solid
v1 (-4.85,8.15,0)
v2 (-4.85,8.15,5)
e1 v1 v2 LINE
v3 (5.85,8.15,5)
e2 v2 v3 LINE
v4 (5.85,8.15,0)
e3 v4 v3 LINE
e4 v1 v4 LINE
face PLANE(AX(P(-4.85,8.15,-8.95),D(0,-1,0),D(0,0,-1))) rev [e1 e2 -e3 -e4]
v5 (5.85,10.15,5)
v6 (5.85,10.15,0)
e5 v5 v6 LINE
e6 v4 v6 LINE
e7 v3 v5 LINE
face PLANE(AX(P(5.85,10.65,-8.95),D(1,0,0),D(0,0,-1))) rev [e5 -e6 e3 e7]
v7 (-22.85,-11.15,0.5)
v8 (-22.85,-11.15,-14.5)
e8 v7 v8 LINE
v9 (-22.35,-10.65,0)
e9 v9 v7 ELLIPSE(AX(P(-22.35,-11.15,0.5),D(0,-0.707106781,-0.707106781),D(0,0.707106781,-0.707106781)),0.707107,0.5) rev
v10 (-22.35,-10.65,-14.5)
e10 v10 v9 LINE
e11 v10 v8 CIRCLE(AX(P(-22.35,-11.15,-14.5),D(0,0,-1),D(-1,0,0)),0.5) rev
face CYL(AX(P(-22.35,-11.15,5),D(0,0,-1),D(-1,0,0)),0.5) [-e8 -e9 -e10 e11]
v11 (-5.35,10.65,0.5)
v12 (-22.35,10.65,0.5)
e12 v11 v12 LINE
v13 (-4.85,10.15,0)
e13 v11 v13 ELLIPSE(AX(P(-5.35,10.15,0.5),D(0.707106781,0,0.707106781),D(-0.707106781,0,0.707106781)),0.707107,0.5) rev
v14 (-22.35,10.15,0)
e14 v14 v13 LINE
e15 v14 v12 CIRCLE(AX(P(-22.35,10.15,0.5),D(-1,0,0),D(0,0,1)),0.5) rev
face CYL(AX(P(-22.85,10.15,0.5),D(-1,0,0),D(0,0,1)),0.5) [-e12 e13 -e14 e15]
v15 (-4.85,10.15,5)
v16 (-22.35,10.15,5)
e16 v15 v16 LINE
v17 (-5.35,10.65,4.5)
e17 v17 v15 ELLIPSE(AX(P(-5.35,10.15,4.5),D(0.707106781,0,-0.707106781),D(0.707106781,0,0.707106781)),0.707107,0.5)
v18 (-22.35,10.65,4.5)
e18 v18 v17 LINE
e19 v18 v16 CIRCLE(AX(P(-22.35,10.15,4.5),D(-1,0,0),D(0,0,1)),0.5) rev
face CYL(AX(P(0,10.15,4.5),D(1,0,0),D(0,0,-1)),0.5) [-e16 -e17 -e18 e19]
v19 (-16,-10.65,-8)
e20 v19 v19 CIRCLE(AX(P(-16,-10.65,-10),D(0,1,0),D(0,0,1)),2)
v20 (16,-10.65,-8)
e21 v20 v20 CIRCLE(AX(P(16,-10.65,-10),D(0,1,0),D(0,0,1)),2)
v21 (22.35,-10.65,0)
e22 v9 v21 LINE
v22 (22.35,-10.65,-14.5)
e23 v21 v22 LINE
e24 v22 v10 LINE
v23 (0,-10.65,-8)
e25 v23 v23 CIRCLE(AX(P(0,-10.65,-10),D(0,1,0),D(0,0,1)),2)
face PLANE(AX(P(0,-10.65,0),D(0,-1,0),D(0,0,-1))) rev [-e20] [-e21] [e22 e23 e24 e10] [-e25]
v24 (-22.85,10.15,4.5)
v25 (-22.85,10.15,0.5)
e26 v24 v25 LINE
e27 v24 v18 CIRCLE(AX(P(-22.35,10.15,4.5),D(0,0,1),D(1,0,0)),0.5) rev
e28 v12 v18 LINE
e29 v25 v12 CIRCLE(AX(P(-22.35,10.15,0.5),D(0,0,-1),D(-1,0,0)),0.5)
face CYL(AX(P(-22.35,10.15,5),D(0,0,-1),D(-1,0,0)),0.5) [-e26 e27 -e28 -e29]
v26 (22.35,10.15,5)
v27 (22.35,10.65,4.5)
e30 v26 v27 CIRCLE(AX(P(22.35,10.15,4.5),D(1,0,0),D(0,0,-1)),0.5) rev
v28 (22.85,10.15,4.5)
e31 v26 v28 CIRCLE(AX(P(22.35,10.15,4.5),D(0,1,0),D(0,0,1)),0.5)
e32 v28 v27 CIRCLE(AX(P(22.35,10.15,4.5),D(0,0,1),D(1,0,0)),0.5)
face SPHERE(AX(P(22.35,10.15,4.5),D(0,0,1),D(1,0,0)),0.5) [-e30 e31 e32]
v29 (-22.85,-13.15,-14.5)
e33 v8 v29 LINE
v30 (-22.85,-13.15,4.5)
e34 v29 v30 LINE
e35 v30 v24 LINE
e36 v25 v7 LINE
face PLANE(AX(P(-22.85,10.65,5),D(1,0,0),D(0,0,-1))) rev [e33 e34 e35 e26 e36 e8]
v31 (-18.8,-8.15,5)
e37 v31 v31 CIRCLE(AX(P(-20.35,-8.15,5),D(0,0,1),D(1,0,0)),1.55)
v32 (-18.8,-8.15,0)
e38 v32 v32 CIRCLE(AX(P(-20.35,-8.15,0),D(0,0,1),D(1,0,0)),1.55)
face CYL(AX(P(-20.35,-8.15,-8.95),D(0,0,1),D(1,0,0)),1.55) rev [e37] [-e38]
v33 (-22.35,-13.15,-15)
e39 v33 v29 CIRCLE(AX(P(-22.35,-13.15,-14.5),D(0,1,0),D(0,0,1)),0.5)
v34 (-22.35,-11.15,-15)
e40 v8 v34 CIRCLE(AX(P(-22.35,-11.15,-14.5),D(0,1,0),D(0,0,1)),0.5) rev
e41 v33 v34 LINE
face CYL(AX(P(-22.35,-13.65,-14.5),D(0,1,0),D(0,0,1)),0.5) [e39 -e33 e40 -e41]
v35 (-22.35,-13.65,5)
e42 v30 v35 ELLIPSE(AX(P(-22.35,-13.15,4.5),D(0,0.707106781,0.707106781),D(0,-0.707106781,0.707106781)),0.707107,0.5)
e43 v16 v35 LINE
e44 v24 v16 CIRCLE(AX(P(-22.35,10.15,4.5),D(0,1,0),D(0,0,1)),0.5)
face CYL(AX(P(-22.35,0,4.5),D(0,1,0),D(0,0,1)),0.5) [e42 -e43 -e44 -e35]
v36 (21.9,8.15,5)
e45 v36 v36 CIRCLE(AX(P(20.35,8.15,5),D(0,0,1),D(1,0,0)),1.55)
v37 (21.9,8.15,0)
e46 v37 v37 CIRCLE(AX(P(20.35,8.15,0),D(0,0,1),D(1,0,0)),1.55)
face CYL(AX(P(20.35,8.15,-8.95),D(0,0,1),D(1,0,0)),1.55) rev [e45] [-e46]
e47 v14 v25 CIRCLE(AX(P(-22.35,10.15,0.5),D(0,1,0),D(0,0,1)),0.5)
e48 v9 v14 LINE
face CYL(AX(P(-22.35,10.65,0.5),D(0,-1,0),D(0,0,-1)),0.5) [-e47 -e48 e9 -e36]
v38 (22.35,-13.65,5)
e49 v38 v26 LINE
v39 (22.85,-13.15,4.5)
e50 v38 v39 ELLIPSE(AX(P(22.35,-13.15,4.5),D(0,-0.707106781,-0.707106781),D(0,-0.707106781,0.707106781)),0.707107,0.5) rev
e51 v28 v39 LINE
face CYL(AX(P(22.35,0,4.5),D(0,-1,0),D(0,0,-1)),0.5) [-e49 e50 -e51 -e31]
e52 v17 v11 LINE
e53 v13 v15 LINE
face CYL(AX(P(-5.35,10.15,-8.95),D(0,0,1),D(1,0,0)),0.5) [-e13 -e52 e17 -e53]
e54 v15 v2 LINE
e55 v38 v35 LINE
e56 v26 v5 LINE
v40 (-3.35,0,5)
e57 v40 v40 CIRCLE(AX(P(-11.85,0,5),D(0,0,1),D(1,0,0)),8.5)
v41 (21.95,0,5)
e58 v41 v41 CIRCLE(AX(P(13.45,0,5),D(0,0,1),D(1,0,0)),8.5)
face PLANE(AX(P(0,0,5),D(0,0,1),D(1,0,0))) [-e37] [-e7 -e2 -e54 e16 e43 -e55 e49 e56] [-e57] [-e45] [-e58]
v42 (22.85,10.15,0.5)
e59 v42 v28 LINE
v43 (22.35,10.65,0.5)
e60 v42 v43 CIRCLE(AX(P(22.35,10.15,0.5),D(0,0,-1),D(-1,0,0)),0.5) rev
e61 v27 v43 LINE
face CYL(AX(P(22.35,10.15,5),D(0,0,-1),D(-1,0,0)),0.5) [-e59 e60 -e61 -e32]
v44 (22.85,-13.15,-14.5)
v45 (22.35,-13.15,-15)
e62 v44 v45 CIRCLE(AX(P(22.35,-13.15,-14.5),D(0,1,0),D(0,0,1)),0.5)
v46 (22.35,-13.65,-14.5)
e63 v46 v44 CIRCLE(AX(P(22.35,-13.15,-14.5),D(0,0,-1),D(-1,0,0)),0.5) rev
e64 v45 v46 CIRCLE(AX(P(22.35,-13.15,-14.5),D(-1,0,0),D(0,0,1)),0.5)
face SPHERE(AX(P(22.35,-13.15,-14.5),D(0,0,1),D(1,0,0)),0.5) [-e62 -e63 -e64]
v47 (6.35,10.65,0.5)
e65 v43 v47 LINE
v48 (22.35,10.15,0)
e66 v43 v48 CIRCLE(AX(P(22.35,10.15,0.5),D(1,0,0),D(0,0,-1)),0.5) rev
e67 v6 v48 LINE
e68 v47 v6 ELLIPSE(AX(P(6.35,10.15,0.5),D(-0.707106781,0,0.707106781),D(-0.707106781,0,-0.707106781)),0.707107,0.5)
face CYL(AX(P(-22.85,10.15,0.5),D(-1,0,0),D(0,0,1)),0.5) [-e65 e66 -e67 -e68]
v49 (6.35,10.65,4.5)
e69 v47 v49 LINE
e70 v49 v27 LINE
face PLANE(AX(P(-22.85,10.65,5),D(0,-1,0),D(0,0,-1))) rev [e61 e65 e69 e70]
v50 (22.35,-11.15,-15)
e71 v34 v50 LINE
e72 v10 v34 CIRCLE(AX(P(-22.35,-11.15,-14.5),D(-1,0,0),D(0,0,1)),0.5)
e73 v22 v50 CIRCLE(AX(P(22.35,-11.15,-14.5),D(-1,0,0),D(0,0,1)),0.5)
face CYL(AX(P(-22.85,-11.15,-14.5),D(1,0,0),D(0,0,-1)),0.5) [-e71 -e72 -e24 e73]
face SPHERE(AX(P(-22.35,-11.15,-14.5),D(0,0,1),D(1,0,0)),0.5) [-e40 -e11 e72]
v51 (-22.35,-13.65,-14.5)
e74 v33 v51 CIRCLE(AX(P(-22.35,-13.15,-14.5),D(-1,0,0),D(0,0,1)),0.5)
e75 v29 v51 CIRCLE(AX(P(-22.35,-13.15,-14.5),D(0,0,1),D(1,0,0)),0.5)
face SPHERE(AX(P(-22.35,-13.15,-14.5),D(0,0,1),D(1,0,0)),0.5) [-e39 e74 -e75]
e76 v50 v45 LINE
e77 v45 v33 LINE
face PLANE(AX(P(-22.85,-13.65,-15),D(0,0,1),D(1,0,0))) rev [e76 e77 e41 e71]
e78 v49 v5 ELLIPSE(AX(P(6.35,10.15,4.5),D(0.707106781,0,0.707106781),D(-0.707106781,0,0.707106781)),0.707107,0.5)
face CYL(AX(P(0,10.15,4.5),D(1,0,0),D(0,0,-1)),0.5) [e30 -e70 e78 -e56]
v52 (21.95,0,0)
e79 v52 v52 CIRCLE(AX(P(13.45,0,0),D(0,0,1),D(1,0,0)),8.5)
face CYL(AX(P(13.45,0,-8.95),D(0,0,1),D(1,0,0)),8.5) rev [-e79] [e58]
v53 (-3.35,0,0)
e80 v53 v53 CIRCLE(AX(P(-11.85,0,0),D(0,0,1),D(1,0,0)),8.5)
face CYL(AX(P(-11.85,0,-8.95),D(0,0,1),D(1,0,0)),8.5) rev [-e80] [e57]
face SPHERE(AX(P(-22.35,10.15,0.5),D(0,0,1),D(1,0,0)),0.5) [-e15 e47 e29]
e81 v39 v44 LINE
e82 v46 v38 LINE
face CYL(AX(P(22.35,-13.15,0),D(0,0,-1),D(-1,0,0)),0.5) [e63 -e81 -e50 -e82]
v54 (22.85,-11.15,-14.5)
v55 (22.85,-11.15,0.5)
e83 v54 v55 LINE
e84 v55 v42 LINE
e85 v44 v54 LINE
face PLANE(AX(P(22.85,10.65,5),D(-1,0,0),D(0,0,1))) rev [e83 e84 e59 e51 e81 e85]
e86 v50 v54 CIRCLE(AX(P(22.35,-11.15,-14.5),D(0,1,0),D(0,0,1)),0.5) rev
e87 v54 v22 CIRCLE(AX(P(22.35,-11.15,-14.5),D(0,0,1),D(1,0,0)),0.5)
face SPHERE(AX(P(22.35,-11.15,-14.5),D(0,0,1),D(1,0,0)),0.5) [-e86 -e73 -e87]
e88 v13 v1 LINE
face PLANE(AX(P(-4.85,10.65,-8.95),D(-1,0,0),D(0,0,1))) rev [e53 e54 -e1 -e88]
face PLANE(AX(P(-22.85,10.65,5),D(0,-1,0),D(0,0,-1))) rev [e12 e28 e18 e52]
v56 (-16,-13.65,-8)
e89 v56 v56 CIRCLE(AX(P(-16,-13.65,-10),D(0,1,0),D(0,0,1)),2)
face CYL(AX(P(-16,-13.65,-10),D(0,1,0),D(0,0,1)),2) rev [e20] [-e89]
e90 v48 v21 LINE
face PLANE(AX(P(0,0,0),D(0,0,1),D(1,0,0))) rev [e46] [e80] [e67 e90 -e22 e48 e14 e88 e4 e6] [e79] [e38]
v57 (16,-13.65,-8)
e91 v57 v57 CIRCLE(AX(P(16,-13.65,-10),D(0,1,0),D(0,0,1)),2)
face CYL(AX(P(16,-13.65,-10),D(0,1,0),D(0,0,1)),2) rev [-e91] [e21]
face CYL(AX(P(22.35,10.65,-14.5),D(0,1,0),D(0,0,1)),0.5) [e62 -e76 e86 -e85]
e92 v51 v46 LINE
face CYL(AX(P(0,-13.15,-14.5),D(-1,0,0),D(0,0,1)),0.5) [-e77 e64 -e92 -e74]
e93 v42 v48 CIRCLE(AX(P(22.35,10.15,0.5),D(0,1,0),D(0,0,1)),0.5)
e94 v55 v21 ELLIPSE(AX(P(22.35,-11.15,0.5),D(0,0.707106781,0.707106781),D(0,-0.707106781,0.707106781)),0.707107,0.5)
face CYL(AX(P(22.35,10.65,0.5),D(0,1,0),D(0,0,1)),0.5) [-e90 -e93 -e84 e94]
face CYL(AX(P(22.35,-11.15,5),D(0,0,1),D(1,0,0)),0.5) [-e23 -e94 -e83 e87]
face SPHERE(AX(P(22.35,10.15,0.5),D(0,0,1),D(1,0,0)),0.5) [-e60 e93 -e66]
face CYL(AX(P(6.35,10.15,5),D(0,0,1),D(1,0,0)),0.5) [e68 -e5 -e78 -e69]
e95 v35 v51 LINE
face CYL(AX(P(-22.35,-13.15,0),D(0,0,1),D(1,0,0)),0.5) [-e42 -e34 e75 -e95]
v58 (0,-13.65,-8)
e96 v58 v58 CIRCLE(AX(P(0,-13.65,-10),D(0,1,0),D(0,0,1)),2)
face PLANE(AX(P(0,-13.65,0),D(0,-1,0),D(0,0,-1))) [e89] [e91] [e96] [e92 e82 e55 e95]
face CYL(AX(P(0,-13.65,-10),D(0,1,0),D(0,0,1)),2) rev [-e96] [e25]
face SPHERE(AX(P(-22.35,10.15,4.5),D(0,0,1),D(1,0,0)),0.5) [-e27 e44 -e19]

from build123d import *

# Parameters (mm, degrees)
SKETCH_1_W          = 45.7
SKETCH_1_H          = 21.3
EXTRUDE_1_DEPTH     = 5
SKETCH_2_R          = 1.55
SKETCH_2_R_2        = 8.5
CUT_EXTRUDE_1_DEPTH = 13.95
SKETCH_7_W          = 45.7
SKETCH_7_H          = 20
EXTRUDE_3_DEPTH     = 3
SKETCH_3_W          = 10.7
SKETCH_3_H          = 2.5
CUT_EXTRUDE_2_DEPTH = 13.95
FILLET_4_R          = 0.5
SKETCH_11_R         = 2
CUT_EXTRUDE_4_DEPTH = 3
FILLET_5_R          = 0.5


with BuildPart() as part:
    # 草圖1 → 填料-伸長1 (new body)
    with BuildSketch(Plane.XY):
        Rectangle(SKETCH_1_W, SKETCH_1_H)
    extrude(amount=EXTRUDE_1_DEPTH)

    # 草圖2 → 除料-伸長1 (cut)
    with BuildSketch(Plane.XY.offset(5)):
        with Locations((-20.35, -8.15)):
            Circle(SKETCH_2_R)
        with Locations((20.35, 8.15)):
            Circle(SKETCH_2_R)
        with Locations((-11.85, 0)):
            Circle(SKETCH_2_R_2)
        with Locations((13.45, 0)):
            Circle(SKETCH_2_R_2)
    extrude(amount=-CUT_EXTRUDE_1_DEPTH, mode=Mode.SUBTRACT)

    # 草圖7 → 填料-伸長3 (add)
    with BuildSketch(Plane.XZ.offset(10.65)):
        with Locations((0, -5)):
            Rectangle(SKETCH_7_W, SKETCH_7_H)
    extrude(amount=EXTRUDE_3_DEPTH)

    # 草圖3 → 除料-伸長2 (cut)
    with BuildSketch(Plane.XY.offset(5)):
        with Locations((0.5, 9.4)):
            Rectangle(SKETCH_3_W, SKETCH_3_H)
    extrude(amount=-CUT_EXTRUDE_2_DEPTH, mode=Mode.SUBTRACT)

    # 圓角4
    fillet_4_edges = [part.edges().sort_by_distance(p)[0] for p in [
        (14.35, 10.65, 5),
        (5.85, 10.65, 2.5),
        (14.35, 10.65, 0),
        (-13.85, 10.65, 0),
        (-4.85, 10.65, 2.5),
        (-13.85, 10.65, 5),
        (-22.85, 10.65, 2.5),
        (-22.85, -1.5, 5),
        (-22.85, -13.65, -5),
        (-22.85, -12.15, -15),
        (-22.85, -10.65, -7.5),
        (-22.85, 0, 0),
        (22.85, -10.65, -7.5),
        (22.85, -12.15, -15),
        (22.85, -13.65, -5),
        (22.85, -1.5, 5),
        (22.85, 10.65, 2.5),
        (22.85, 0, 0),
    ]]
    fillet(fillet_4_edges, radius=FILLET_4_R)

    # 草圖11 → 除料-伸長4 (cut)
    with BuildSketch(Plane(origin=(0, -10.65, 0), x_dir=(1, 0, 0), z_dir=(0, 1, 0))):
        with Locations(Location((0, 10, 0), (0, 0, 270))):
            Circle(SKETCH_11_R)
        with Locations(Location((16, 10, 0), (0, 0, 270))):
            Circle(SKETCH_11_R)
        with Locations(Location((-16, 10, 0), (0, 0, 270))):
            Circle(SKETCH_11_R)
    extrude(amount=-CUT_EXTRUDE_4_DEPTH, mode=Mode.SUBTRACT)

    # 圓角5
    # the kernel refuses this fillet: 0.5 mm, written as the material it takes off along each edge
    with BuildSketch(Plane(origin=(-22.35, -13.15, -14.5), x_dir=(0, 0, -1), z_dir=(0, -1, 0))) as fillet_5_piece_1_section:
        Polygon((0, 0), (FILLET_5_R, 0), (FILLET_5_R, -FILLET_5_R), (0, -FILLET_5_R), align=None)
    fillet_5_piece_1 = extrude(amount=FILLET_5_R, mode=Mode.PRIVATE)
    fillet_5_piece_1 = fillet_5_piece_1 - Plane(origin=(-22.35, -13.15, -14.5), x_dir=(0.7071067811865475, 0, 0.7071067811865475), z_dir=(0, -1, 0)) * Sphere(FILLET_5_R, mode=Mode.PRIVATE)
    add(fillet_5_piece_1, mode=Mode.SUBTRACT)
    with BuildSketch(Plane(origin=(-22.35, -11.15, -14.5), x_dir=(0, 0, -1), z_dir=(0, 1, 0))) as fillet_5_piece_2_section:
        Polygon((0, 0), (FILLET_5_R, 0), (FILLET_5_R, FILLET_5_R), (0, FILLET_5_R), align=None)
    fillet_5_piece_2 = extrude(amount=FILLET_5_R, mode=Mode.PRIVATE)
    fillet_5_piece_2 = fillet_5_piece_2 - Plane(origin=(-22.35, -11.15, -14.5), x_dir=(0.7071067811865475, 0, 0.7071067811865475), z_dir=(0, 1, 0)) * Sphere(FILLET_5_R, mode=Mode.PRIVATE)
    add(fillet_5_piece_2, mode=Mode.SUBTRACT)
    with BuildSketch(Plane(origin=(22.35, -11.15, -14.5), x_dir=(0, 0, -1), z_dir=(0, 1, 0))) as fillet_5_piece_3_section:
        Polygon((0, 0), (FILLET_5_R, 0), (FILLET_5_R, -FILLET_5_R), (0, -FILLET_5_R), align=None)
    fillet_5_piece_3 = extrude(amount=FILLET_5_R, mode=Mode.PRIVATE)
    fillet_5_piece_3 = fillet_5_piece_3 - Plane(origin=(22.35, -11.15, -14.5), x_dir=(-0.7071067811865475, 0, 0.7071067811865475), z_dir=(0, 1, 0)) * Sphere(FILLET_5_R, mode=Mode.PRIVATE)
    add(fillet_5_piece_3, mode=Mode.SUBTRACT)
    with BuildSketch(Plane(origin=(22.35, -13.15, -14.5), x_dir=(0, 0, -1), z_dir=(0, -1, 0))) as fillet_5_piece_4_section:
        Polygon((0, 0), (FILLET_5_R, 0), (FILLET_5_R, FILLET_5_R), (0, FILLET_5_R), align=None)
    fillet_5_piece_4 = extrude(amount=FILLET_5_R, mode=Mode.PRIVATE)
    fillet_5_piece_4 = fillet_5_piece_4 - Plane(origin=(22.35, -13.15, -14.5), x_dir=(-0.7071067811865475, 0, 0.7071067811865475), z_dir=(0, -1, 0)) * Sphere(FILLET_5_R, mode=Mode.PRIVATE)
    add(fillet_5_piece_4, mode=Mode.SUBTRACT)
    with BuildSketch(Plane(origin=(-22.35, -13.65, -15), x_dir=(0, 0, 1), z_dir=(1, 0, 0))) as fillet_5_piece_5:
        with BuildLine():
            CenterArc((FILLET_5_R, -FILLET_5_R), FILLET_5_R, 90, 90)
            Line((0, -FILLET_5_R), (0, 0))
            Line((0, 0), (FILLET_5_R, 0))
        make_face()
    extrude(amount=44.7, mode=Mode.SUBTRACT)
    with BuildSketch(Plane(origin=(-22.35, -10.65, -15), x_dir=(0, 0, 1), z_dir=(1, 0, 0))) as fillet_5_piece_6:
        with BuildLine():
            CenterArc((FILLET_5_R, FILLET_5_R), FILLET_5_R, 180, 90)
            Line((0, FILLET_5_R), (0, 0))
            Line((0, 0), (FILLET_5_R, 0))
        make_face()
    extrude(amount=44.7, mode=Mode.SUBTRACT)


solid = part.part
